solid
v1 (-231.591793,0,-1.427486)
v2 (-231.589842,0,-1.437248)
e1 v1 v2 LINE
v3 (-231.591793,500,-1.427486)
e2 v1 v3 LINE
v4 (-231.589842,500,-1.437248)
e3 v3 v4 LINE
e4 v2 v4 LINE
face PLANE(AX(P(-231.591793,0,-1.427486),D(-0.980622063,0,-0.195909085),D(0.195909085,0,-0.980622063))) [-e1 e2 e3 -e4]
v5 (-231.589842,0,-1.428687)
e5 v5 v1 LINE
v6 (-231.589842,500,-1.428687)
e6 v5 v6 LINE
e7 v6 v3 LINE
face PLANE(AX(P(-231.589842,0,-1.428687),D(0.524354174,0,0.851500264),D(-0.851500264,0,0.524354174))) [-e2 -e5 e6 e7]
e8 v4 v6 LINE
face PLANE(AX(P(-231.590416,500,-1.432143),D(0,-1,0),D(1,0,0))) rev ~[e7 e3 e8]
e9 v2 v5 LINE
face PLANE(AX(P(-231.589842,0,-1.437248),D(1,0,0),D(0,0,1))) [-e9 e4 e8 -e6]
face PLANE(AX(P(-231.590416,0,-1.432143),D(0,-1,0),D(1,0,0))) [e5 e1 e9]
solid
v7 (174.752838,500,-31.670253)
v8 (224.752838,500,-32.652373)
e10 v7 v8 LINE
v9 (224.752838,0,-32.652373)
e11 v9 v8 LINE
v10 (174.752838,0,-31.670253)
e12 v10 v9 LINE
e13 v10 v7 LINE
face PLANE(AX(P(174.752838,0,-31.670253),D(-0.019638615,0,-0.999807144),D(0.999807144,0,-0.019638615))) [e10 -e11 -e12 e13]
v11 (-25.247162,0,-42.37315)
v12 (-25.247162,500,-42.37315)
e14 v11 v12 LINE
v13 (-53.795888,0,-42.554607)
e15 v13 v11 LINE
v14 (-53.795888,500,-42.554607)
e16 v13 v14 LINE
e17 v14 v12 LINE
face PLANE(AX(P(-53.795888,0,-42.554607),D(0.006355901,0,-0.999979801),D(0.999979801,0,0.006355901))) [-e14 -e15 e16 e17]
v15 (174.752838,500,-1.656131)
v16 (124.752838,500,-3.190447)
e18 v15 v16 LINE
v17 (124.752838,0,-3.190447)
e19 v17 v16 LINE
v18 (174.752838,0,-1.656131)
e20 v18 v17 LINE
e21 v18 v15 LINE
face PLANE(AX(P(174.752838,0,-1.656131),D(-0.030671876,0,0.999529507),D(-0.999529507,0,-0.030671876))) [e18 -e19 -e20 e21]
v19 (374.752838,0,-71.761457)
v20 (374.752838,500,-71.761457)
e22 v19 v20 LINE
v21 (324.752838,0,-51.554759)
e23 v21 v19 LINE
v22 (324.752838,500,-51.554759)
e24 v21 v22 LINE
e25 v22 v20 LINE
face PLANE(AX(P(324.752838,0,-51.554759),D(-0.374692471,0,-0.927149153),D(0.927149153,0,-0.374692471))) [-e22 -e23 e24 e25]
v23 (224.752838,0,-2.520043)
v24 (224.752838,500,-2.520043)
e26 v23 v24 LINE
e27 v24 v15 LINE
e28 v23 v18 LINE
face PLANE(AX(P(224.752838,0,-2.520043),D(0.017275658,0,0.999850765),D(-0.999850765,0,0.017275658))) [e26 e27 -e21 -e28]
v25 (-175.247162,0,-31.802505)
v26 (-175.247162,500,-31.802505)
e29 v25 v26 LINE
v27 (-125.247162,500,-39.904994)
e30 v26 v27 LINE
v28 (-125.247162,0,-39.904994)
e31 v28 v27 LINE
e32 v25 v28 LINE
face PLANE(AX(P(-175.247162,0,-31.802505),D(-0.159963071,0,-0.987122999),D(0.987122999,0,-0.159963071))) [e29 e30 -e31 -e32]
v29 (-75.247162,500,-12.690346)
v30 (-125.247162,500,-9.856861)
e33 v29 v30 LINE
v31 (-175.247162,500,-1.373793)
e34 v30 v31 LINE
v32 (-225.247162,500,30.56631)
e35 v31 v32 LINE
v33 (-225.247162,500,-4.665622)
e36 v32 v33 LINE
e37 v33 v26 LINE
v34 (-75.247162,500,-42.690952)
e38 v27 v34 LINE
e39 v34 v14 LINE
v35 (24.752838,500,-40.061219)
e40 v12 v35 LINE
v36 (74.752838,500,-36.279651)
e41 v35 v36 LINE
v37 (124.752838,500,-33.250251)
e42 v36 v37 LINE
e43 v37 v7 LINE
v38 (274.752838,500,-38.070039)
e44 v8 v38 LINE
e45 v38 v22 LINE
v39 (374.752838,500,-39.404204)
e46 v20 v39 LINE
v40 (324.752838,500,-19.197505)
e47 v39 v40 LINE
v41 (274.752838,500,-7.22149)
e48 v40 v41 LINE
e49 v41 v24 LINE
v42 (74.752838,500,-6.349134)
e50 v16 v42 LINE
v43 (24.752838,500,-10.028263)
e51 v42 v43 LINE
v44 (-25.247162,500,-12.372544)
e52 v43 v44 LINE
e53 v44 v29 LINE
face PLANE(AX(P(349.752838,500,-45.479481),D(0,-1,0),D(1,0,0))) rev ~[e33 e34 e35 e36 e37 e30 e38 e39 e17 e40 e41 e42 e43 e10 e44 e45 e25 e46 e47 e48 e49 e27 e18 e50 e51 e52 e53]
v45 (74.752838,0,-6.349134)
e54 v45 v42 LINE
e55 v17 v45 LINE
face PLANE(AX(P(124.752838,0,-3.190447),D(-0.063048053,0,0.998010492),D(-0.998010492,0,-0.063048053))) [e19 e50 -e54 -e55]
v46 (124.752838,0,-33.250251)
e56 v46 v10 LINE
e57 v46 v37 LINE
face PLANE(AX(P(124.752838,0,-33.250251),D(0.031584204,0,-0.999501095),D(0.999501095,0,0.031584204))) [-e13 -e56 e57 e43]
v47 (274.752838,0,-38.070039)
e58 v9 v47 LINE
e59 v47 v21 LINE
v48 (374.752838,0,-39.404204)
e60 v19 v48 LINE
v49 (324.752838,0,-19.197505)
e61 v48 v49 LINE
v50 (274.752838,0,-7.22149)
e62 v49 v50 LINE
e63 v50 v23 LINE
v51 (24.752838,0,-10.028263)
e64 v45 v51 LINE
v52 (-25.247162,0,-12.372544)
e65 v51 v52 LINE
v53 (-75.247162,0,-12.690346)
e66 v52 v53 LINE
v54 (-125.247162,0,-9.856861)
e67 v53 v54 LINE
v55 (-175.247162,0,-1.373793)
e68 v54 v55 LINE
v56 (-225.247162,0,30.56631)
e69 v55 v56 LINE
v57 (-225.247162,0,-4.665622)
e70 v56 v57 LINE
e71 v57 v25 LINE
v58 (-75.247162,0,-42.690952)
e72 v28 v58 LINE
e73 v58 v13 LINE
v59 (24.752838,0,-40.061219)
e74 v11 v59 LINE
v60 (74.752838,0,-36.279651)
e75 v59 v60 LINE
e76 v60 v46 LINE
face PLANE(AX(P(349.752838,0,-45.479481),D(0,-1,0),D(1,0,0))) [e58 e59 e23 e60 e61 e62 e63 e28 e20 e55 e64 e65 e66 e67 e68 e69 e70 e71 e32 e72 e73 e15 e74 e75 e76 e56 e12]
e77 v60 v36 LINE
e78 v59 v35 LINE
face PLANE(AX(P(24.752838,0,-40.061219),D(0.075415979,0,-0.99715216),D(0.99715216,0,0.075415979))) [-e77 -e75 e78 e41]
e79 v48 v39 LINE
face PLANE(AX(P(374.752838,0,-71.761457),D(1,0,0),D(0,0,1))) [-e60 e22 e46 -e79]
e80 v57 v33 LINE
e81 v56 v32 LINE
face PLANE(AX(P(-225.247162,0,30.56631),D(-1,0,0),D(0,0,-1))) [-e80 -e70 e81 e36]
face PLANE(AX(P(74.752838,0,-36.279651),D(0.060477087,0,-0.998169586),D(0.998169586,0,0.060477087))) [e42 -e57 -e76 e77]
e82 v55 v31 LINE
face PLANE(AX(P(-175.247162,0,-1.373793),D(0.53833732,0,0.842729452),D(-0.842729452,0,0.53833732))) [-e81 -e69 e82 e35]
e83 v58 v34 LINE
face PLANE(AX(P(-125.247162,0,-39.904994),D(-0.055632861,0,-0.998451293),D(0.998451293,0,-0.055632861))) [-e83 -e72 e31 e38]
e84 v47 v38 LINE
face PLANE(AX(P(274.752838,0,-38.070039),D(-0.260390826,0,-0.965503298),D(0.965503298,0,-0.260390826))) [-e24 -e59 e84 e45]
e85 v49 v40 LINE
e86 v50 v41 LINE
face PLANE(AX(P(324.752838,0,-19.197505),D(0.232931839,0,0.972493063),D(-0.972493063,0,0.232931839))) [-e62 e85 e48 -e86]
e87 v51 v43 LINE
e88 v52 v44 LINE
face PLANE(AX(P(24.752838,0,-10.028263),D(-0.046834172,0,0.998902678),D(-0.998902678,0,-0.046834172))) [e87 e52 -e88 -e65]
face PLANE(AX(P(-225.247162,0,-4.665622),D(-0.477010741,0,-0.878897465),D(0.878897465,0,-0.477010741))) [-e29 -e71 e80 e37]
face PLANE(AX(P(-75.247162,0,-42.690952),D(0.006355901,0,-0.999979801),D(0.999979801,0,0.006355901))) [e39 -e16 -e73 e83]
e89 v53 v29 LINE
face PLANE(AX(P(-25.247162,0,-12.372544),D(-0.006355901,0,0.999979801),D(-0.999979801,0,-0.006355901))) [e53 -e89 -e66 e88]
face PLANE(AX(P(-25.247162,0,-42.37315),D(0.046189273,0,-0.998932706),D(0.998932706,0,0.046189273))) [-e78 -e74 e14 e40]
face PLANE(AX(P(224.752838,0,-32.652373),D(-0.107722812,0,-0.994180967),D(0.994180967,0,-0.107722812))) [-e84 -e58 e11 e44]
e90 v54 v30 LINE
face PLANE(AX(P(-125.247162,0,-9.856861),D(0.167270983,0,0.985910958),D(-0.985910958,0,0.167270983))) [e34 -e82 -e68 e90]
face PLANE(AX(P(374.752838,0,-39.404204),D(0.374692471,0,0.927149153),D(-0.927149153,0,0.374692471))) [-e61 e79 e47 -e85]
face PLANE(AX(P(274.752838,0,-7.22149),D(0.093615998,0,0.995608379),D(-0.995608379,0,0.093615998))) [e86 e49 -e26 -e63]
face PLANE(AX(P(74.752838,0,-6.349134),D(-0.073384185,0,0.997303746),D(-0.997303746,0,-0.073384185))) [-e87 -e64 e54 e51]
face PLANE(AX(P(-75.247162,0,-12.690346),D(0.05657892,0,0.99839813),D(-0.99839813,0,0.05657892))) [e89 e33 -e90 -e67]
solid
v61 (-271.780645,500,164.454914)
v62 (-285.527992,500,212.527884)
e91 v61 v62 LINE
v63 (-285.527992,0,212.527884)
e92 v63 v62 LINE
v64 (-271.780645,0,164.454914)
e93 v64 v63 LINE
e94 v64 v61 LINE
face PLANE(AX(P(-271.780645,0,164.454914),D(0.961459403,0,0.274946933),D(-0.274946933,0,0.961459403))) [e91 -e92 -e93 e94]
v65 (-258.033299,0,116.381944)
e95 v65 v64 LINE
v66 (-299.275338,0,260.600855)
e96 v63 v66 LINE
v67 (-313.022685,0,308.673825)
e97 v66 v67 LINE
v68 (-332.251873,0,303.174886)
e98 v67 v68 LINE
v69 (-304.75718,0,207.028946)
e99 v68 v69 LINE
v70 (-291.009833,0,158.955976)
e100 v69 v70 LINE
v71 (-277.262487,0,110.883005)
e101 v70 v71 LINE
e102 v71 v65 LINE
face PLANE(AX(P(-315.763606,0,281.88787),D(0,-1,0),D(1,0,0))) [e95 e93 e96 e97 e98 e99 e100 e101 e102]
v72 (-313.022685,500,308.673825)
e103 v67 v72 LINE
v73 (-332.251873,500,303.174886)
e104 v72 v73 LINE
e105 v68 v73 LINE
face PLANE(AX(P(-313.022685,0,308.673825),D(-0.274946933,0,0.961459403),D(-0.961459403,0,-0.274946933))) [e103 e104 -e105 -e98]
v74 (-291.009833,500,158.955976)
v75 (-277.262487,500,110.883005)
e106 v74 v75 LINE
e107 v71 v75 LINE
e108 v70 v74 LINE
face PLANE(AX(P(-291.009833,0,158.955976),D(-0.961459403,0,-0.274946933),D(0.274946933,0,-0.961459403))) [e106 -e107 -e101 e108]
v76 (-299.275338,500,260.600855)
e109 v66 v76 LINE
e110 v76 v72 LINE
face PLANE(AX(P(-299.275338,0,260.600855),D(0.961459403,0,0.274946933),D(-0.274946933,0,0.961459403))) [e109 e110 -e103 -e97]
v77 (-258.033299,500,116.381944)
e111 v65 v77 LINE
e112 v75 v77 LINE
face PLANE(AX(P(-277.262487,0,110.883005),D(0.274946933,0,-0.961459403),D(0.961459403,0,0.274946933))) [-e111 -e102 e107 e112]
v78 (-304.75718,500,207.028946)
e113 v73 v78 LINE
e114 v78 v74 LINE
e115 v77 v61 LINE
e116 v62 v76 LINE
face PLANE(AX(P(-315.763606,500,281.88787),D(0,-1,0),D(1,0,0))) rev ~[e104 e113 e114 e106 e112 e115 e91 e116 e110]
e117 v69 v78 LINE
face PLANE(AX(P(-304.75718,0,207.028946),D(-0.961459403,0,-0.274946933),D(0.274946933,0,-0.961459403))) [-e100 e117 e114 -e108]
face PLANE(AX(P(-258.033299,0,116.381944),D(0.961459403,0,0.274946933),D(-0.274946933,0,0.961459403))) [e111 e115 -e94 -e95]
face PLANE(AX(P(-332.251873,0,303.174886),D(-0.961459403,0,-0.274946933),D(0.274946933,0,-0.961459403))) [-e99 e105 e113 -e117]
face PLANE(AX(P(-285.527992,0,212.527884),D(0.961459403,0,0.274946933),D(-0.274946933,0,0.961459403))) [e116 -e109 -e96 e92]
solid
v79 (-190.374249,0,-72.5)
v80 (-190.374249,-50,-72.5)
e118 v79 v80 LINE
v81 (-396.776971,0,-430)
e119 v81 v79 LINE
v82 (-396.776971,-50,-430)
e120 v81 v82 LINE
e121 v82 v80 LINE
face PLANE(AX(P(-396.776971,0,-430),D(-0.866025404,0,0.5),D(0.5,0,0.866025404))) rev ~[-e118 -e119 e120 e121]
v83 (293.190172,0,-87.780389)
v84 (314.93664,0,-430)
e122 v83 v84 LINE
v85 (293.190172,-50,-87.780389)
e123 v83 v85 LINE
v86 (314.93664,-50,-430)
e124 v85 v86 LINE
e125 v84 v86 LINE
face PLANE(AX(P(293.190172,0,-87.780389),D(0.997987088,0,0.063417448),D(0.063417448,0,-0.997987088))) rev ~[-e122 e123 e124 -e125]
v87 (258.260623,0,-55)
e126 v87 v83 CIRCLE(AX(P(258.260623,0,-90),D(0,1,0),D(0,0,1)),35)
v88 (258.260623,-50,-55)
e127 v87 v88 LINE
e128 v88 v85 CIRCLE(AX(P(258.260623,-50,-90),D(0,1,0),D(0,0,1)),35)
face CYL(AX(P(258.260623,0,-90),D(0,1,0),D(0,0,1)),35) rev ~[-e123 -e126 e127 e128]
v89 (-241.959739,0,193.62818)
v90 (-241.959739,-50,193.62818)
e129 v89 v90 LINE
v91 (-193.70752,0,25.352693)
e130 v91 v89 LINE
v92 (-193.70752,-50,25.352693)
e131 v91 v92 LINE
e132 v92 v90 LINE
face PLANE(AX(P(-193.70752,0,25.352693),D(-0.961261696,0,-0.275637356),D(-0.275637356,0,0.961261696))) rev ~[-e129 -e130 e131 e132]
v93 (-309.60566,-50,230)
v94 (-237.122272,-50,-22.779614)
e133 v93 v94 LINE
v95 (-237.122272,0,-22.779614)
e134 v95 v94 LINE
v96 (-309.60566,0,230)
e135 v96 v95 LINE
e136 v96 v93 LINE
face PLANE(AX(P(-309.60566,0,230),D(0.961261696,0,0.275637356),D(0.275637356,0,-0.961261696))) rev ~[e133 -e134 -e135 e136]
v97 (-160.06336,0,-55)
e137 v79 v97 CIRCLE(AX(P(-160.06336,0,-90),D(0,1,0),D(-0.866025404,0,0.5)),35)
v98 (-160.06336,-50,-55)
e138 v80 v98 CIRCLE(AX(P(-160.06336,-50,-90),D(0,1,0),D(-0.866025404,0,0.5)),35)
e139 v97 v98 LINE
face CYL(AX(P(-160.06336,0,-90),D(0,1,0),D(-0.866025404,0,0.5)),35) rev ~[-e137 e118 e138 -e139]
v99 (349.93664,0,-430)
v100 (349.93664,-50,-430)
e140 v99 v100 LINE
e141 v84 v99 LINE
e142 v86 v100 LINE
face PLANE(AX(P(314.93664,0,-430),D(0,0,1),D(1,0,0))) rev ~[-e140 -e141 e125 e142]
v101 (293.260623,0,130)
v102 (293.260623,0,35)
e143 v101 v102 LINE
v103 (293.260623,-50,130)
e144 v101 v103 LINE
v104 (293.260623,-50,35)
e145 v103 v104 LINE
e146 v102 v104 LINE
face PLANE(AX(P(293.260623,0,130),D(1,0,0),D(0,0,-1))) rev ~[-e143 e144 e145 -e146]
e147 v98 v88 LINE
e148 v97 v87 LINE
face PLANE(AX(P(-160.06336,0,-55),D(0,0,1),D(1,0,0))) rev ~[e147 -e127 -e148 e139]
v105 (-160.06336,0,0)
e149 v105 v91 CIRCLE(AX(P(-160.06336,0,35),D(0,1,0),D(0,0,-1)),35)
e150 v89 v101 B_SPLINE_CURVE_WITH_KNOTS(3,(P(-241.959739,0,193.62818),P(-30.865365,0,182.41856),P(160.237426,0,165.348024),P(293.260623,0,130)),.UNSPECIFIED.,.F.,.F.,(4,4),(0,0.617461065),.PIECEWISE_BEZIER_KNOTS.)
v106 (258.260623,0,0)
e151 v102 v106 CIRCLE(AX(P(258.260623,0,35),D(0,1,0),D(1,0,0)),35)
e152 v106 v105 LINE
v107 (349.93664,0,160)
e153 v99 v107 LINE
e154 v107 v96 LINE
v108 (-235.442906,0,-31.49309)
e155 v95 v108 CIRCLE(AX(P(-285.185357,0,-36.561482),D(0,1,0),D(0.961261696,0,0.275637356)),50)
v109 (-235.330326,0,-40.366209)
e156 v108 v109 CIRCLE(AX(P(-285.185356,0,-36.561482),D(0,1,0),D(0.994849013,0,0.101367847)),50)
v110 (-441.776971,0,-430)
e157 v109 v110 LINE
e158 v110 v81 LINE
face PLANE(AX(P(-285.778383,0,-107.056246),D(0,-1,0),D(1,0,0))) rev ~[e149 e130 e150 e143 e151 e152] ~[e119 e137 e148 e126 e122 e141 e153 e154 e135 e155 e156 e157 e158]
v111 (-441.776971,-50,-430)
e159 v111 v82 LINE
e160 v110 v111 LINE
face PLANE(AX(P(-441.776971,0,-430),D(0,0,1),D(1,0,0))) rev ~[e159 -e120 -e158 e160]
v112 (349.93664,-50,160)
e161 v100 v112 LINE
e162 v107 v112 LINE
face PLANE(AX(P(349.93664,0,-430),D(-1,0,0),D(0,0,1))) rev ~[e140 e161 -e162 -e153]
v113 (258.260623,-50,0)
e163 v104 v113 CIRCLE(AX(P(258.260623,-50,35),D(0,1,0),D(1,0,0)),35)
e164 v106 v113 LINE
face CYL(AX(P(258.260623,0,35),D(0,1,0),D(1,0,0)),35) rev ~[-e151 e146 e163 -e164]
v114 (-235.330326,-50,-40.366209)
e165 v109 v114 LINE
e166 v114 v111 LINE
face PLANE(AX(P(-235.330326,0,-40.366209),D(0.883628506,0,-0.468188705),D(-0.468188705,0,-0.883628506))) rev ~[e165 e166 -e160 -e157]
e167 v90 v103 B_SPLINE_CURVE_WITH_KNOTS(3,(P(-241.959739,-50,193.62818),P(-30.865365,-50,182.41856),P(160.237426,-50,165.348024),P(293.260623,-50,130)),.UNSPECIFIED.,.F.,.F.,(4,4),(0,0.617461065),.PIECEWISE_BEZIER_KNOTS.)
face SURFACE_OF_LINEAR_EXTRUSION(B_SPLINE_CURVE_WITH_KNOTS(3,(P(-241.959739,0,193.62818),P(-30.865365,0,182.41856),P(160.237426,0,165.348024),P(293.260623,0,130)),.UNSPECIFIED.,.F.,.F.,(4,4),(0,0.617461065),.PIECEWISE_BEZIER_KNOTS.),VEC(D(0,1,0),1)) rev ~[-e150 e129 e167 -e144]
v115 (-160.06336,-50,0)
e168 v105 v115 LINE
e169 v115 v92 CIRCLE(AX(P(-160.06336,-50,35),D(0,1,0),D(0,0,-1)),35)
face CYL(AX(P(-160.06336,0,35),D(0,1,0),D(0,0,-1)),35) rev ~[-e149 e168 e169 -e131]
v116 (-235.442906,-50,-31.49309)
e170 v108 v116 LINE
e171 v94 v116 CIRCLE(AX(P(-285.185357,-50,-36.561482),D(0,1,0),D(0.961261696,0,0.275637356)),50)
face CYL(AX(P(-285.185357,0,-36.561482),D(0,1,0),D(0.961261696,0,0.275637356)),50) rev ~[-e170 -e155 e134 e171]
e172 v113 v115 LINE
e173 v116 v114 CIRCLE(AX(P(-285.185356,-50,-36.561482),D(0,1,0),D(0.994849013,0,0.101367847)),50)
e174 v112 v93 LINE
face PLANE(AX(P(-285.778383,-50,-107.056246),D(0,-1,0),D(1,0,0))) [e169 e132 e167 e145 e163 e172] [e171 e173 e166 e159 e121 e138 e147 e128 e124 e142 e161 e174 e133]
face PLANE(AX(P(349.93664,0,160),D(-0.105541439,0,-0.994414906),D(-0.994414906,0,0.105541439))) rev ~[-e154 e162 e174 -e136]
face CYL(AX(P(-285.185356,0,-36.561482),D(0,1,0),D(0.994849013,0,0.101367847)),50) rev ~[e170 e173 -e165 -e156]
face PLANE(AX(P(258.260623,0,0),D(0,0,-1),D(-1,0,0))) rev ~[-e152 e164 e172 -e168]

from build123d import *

# Parameters (mm, degrees)
F2_DEPTH = 500
F3_DEPTH = 50


with BuildPart() as f2:
    # F1 (on Front) → F2 (new body)
    with BuildSketch(Plane.XZ):
        Polygon((-313.022685147, 308.6738246905), (-332.2518732106, 303.1748860281), (-318.5045265546, 255.101915869), (-299.275338491, 260.6008545314), align=None)
        Polygon((-299.275338491, 260.6008545314), (-318.5045265546, 255.101915869), (-304.7571798986, 207.0289457099), (-285.5279918349, 212.5278843723), align=None)
        Polygon((-285.5279918349, 212.5278843723), (-304.7571798986, 207.0289457099), (-291.0098332425, 158.9559755508), (-271.7806451789, 164.4549142132), align=None)
        Polygon((-271.7806451789, 164.4549142132), (-291.0098332425, 158.9559755508), (-277.2624865865, 110.8830053917), (-258.0332985228, 116.3819440541), align=None)
    extrude(amount=-F2_DEPTH)


with BuildPart() as f2b:
    # F1 (on Front) → F2, piece 2 (new body)
    with BuildSketch(Plane.XZ):
        Polygon((374.7528376444, -39.4042041541), (324.7528376444, -19.1975054732), (324.7528376444, -51.5547587832), (374.7528376444, -71.7614574641), align=None)
        Polygon((324.7528376444, -51.5547587832), (324.7528376444, -19.1975054732), (274.7528376444, -7.2214900208), (274.7528376444, -38.0700391051), align=None)
        Polygon((274.7528376444, -38.0700391051), (274.7528376444, -7.2214900208), (224.7528376444, -2.5200431725), (224.7528376444, -32.6523729345), align=None)
        Polygon((224.7528376444, -32.6523729345), (224.7528376444, -2.5200431725), (174.7528376444, -1.656131361), (174.7528376444, -31.670252785), align=None)
        Polygon((174.7528376444, -31.670252785), (174.7528376444, -1.656131361), (124.7528376444, -3.1904470413), (124.7528376444, -33.25025125), align=None)
        Polygon((124.7528376444, -33.25025125), (124.7528376444, -3.1904470413), (74.7528376444, -6.3491339475), (74.7528376444, -36.2796506691), align=None)
        Polygon((74.7528376444, -36.2796506691), (74.7528376444, -6.3491339475), (24.7528376444, -10.0282630796), (24.7528376444, -40.061218899), align=None)
        Polygon((24.7528376444, -40.061218899), (24.7528376444, -10.0282630796), (-25.2471623556, -12.3725440927), (-25.2471623556, -42.3731500731), align=None)
        with BuildLine():
            Line((-25.2471623556, -42.3731500731), (-25.2471623556, -12.3725440927))
            Line((-25.2471623556, -12.3725440927), (-60.3584851816, -12.5957126798))
            add(Edge.make_bspline(
                [(-60.3584851816, -12.5957126798), (-56.9180854904, -21.5284331632), (-55.115206892, -31.8869926762), (-53.7958883398, -42.5546066042)],
                knots=[0.8239164259, 0.8239164259, 0.8239164259, 0.8239164259, 0.9454560047, 0.9454560047, 0.9454560047, 0.9454560047], degree=3))
            Line((-53.7958883398, -42.5546066042), (-25.2471623556, -42.3731500731))
        make_face()
        with BuildLine():
            add(Edge.make_bspline(
                [(-60.3584851816, -12.5957126798), (-56.9180854904, -21.5284331632), (-55.115206892, -31.8869926762), (-53.7958883398, -42.5546066042)],
                knots=[0.8239164259, 0.8239164259, 0.8239164259, 0.8239164259, 0.9454560047, 0.9454560047, 0.9454560047, 0.9454560047], degree=3))
            Line((-60.3584851816, -12.5957126798), (-75.2471623556, -12.6903455441))
            Line((-75.2471623556, -12.6903455441), (-75.2471623556, -42.6909515245))
            Line((-75.2471623556, -42.6909515245), (-53.7958883398, -42.5546066042))
        make_face()
        with BuildLine():
            Line((-175.2471623556, -1.3737931919), (-185.149231833, 4.9516693116))
            add(Edge.make_bspline(
                [(-225.2471623556, 3.6267801279), (-218.5699288591, 0.1086035939), (-203.4752736384, 1.8377965797), (-185.149231833, 4.9516693116)],
                knots=[0.2038986096, 0.2038986096, 0.2038986096, 0.2038986096, 0.368291831, 0.368291831, 0.368291831, 0.368291831], degree=3))
            Line((-225.2471623556, 3.6267801279), (-225.2471623556, -4.6656222887))
            Line((-225.2471623556, -4.6656222887), (-175.2471623556, -31.8025045694))
            Line((-175.2471623556, -31.8025045694), (-175.2471623556, -1.3737931919))
        make_face()
        with BuildLine():
            add(Edge.make_bspline(
                [(-225.2471623556, 3.6267801279), (-218.5699288591, 0.1086035939), (-203.4752736384, 1.8377965797), (-185.149231833, 4.9516693116)],
                knots=[0.2038986096, 0.2038986096, 0.2038986096, 0.2038986096, 0.368291831, 0.368291831, 0.368291831, 0.368291831], degree=3))
            Line((-185.149231833, 4.9516693116), (-225.2471623556, 30.5663104296))
            Line((-225.2471623556, 30.5663104296), (-225.2471623556, 3.6267801279))
        make_face()
        Polygon((-75.2471623556, -42.6909515245), (-75.2471623556, -12.6903455441), (-125.2471623556, -9.8568606564), (-125.2471623556, -39.9049938626), align=None)
        Polygon((-125.2471623556, -9.8568606564), (-175.2471623556, -1.3737931919), (-175.2471623556, -31.8025045694), (-125.2471623556, -39.9049938626), align=None)
    extrude(amount=-F2_DEPTH)


with BuildPart() as f2c:
    # F1 (on Front) → F2, piece 3 (new body)
    with BuildSketch(Plane.XZ):
        Polygon((-231.5898423556, -1.4372480625), (-231.5898423556, -1.4286871489), (-231.5917925852, -1.4274861968), align=None)
    extrude(amount=-F2_DEPTH)


with BuildPart() as f3:
    # F0 (on Front) → F3 (new body)
    with BuildSketch(Plane.XZ):
        with BuildLine():
            ThreePointArc((-160.0633602421, -55), (-166.7365377228, -27.5), (-160.0633602421, 0))
            ThreePointArc((-160.0633602421, 0), (-181.1268860524, 7.0477571483), (-193.7075195999, 25.3526925464))
            Line((-193.7075195999, 25.3526925464), (-241.9597391517, 193.6281799587))
            Line((-241.9597391517, 193.6281799587), (-309.6056596926, 230))
            Line((-309.6056596926, 230), (-237.122271712, -22.7796141821))
            ThreePointArc((-237.122271712, -22.7796141821), (-236.0889018962, -27.0990222261), (-235.4429058376, -31.4930896038))
            ThreePointArc((-235.4429058376, -31.4930896038), (-235.1893804809, -35.9271468791), (-235.3303261555, -40.3662090936))
            Line((-235.3303261555, -40.3662090936), (-441.7769706098, -430))
            Line((-441.7769706098, -430), (-396.7769706098, -430))
            Line((-396.7769706098, -430), (-190.3742493745, -72.5))
            ThreePointArc((-190.3742493745, -72.5), (-177.5633602421, -59.6891108675), (-160.0633602421, -55))
        make_face()
        with BuildLine():
            Line((258.2606234636, 0), (-160.0633602421, 0))
            ThreePointArc((-160.0633602421, 0), (-166.7365377228, -27.5), (-160.0633602421, -55))
            Line((-160.0633602421, -55), (258.2606234636, -55))
            ThreePointArc((258.2606234636, -55), (264.9338009444, -27.5), (258.2606234636, 0))
        make_face()
        with BuildLine():
            ThreePointArc((293.2606234636, 35), (283.0093608052, 10.2512626585), (258.2606234636, 0))
            ThreePointArc((258.2606234636, 0), (264.9338009444, -27.5), (258.2606234636, -55))
            ThreePointArc((258.2606234636, -55), (282.2117573173, -64.4785739598), (293.1901715336, -87.7803893072))
            Line((293.1901715336, -87.7803893072), (314.9366397579, -430))
            Line((314.9366397579, -430), (348.9601495671, -430))
            Line((348.9601495671, -430), (349.7293803363, -430))
            Line((349.7293803363, -430), (349.9366397579, -430))
            Line((349.9366397579, -430), (349.9366397579, 112.6860928485))
            add(Edge.make_bspline(
                [(293.2606234636, 130), (313.447396449, 124.6358037529), (332.2966423185, 118.8506913972), (349.9366397579, 112.6860928485)],
                knots=[0.6174610646, 0.6174610646, 0.6174610646, 0.6174610646, 0.7111631147, 0.7111631147, 0.7111631147, 0.7111631147], degree=3))
            Line((293.2606234636, 130), (293.2606234636, 35))
        make_face()
        with BuildLine():
            Line((-309.6056596926, 230), (-241.9597391517, 193.6281799587))
            add(Edge.make_bspline(
                [(-241.9597391517, 193.6281799587), (-30.8653650886, 182.4185598631), (160.2374256996, 165.3480241113), (293.2606234636, 130)],
                knots=[0, 0, 0, 0, 0.6174610646, 0.6174610646, 0.6174610646, 0.6174610646], degree=3))
            Line((293.2606234636, 130), (349.9366397579, 160))
            Line((349.9366397579, 160), (-309.6056596926, 230))
        make_face()
        with BuildLine():
            Line((349.9366397579, 160), (293.2606234636, 130))
            add(Edge.make_bspline(
                [(293.2606234636, 130), (313.447396449, 124.6358037529), (332.2966423185, 118.8506913972), (349.9366397579, 112.6860928485)],
                knots=[0.6174610646, 0.6174610646, 0.6174610646, 0.6174610646, 0.7111631147, 0.7111631147, 0.7111631147, 0.7111631147], degree=3))
            Line((349.9366397579, 112.6860928485), (349.9366397579, 160))
        make_face()
    extrude(amount=F3_DEPTH)


solid = Compound([f2.part, f2b.part, f2c.part, f3.part])
